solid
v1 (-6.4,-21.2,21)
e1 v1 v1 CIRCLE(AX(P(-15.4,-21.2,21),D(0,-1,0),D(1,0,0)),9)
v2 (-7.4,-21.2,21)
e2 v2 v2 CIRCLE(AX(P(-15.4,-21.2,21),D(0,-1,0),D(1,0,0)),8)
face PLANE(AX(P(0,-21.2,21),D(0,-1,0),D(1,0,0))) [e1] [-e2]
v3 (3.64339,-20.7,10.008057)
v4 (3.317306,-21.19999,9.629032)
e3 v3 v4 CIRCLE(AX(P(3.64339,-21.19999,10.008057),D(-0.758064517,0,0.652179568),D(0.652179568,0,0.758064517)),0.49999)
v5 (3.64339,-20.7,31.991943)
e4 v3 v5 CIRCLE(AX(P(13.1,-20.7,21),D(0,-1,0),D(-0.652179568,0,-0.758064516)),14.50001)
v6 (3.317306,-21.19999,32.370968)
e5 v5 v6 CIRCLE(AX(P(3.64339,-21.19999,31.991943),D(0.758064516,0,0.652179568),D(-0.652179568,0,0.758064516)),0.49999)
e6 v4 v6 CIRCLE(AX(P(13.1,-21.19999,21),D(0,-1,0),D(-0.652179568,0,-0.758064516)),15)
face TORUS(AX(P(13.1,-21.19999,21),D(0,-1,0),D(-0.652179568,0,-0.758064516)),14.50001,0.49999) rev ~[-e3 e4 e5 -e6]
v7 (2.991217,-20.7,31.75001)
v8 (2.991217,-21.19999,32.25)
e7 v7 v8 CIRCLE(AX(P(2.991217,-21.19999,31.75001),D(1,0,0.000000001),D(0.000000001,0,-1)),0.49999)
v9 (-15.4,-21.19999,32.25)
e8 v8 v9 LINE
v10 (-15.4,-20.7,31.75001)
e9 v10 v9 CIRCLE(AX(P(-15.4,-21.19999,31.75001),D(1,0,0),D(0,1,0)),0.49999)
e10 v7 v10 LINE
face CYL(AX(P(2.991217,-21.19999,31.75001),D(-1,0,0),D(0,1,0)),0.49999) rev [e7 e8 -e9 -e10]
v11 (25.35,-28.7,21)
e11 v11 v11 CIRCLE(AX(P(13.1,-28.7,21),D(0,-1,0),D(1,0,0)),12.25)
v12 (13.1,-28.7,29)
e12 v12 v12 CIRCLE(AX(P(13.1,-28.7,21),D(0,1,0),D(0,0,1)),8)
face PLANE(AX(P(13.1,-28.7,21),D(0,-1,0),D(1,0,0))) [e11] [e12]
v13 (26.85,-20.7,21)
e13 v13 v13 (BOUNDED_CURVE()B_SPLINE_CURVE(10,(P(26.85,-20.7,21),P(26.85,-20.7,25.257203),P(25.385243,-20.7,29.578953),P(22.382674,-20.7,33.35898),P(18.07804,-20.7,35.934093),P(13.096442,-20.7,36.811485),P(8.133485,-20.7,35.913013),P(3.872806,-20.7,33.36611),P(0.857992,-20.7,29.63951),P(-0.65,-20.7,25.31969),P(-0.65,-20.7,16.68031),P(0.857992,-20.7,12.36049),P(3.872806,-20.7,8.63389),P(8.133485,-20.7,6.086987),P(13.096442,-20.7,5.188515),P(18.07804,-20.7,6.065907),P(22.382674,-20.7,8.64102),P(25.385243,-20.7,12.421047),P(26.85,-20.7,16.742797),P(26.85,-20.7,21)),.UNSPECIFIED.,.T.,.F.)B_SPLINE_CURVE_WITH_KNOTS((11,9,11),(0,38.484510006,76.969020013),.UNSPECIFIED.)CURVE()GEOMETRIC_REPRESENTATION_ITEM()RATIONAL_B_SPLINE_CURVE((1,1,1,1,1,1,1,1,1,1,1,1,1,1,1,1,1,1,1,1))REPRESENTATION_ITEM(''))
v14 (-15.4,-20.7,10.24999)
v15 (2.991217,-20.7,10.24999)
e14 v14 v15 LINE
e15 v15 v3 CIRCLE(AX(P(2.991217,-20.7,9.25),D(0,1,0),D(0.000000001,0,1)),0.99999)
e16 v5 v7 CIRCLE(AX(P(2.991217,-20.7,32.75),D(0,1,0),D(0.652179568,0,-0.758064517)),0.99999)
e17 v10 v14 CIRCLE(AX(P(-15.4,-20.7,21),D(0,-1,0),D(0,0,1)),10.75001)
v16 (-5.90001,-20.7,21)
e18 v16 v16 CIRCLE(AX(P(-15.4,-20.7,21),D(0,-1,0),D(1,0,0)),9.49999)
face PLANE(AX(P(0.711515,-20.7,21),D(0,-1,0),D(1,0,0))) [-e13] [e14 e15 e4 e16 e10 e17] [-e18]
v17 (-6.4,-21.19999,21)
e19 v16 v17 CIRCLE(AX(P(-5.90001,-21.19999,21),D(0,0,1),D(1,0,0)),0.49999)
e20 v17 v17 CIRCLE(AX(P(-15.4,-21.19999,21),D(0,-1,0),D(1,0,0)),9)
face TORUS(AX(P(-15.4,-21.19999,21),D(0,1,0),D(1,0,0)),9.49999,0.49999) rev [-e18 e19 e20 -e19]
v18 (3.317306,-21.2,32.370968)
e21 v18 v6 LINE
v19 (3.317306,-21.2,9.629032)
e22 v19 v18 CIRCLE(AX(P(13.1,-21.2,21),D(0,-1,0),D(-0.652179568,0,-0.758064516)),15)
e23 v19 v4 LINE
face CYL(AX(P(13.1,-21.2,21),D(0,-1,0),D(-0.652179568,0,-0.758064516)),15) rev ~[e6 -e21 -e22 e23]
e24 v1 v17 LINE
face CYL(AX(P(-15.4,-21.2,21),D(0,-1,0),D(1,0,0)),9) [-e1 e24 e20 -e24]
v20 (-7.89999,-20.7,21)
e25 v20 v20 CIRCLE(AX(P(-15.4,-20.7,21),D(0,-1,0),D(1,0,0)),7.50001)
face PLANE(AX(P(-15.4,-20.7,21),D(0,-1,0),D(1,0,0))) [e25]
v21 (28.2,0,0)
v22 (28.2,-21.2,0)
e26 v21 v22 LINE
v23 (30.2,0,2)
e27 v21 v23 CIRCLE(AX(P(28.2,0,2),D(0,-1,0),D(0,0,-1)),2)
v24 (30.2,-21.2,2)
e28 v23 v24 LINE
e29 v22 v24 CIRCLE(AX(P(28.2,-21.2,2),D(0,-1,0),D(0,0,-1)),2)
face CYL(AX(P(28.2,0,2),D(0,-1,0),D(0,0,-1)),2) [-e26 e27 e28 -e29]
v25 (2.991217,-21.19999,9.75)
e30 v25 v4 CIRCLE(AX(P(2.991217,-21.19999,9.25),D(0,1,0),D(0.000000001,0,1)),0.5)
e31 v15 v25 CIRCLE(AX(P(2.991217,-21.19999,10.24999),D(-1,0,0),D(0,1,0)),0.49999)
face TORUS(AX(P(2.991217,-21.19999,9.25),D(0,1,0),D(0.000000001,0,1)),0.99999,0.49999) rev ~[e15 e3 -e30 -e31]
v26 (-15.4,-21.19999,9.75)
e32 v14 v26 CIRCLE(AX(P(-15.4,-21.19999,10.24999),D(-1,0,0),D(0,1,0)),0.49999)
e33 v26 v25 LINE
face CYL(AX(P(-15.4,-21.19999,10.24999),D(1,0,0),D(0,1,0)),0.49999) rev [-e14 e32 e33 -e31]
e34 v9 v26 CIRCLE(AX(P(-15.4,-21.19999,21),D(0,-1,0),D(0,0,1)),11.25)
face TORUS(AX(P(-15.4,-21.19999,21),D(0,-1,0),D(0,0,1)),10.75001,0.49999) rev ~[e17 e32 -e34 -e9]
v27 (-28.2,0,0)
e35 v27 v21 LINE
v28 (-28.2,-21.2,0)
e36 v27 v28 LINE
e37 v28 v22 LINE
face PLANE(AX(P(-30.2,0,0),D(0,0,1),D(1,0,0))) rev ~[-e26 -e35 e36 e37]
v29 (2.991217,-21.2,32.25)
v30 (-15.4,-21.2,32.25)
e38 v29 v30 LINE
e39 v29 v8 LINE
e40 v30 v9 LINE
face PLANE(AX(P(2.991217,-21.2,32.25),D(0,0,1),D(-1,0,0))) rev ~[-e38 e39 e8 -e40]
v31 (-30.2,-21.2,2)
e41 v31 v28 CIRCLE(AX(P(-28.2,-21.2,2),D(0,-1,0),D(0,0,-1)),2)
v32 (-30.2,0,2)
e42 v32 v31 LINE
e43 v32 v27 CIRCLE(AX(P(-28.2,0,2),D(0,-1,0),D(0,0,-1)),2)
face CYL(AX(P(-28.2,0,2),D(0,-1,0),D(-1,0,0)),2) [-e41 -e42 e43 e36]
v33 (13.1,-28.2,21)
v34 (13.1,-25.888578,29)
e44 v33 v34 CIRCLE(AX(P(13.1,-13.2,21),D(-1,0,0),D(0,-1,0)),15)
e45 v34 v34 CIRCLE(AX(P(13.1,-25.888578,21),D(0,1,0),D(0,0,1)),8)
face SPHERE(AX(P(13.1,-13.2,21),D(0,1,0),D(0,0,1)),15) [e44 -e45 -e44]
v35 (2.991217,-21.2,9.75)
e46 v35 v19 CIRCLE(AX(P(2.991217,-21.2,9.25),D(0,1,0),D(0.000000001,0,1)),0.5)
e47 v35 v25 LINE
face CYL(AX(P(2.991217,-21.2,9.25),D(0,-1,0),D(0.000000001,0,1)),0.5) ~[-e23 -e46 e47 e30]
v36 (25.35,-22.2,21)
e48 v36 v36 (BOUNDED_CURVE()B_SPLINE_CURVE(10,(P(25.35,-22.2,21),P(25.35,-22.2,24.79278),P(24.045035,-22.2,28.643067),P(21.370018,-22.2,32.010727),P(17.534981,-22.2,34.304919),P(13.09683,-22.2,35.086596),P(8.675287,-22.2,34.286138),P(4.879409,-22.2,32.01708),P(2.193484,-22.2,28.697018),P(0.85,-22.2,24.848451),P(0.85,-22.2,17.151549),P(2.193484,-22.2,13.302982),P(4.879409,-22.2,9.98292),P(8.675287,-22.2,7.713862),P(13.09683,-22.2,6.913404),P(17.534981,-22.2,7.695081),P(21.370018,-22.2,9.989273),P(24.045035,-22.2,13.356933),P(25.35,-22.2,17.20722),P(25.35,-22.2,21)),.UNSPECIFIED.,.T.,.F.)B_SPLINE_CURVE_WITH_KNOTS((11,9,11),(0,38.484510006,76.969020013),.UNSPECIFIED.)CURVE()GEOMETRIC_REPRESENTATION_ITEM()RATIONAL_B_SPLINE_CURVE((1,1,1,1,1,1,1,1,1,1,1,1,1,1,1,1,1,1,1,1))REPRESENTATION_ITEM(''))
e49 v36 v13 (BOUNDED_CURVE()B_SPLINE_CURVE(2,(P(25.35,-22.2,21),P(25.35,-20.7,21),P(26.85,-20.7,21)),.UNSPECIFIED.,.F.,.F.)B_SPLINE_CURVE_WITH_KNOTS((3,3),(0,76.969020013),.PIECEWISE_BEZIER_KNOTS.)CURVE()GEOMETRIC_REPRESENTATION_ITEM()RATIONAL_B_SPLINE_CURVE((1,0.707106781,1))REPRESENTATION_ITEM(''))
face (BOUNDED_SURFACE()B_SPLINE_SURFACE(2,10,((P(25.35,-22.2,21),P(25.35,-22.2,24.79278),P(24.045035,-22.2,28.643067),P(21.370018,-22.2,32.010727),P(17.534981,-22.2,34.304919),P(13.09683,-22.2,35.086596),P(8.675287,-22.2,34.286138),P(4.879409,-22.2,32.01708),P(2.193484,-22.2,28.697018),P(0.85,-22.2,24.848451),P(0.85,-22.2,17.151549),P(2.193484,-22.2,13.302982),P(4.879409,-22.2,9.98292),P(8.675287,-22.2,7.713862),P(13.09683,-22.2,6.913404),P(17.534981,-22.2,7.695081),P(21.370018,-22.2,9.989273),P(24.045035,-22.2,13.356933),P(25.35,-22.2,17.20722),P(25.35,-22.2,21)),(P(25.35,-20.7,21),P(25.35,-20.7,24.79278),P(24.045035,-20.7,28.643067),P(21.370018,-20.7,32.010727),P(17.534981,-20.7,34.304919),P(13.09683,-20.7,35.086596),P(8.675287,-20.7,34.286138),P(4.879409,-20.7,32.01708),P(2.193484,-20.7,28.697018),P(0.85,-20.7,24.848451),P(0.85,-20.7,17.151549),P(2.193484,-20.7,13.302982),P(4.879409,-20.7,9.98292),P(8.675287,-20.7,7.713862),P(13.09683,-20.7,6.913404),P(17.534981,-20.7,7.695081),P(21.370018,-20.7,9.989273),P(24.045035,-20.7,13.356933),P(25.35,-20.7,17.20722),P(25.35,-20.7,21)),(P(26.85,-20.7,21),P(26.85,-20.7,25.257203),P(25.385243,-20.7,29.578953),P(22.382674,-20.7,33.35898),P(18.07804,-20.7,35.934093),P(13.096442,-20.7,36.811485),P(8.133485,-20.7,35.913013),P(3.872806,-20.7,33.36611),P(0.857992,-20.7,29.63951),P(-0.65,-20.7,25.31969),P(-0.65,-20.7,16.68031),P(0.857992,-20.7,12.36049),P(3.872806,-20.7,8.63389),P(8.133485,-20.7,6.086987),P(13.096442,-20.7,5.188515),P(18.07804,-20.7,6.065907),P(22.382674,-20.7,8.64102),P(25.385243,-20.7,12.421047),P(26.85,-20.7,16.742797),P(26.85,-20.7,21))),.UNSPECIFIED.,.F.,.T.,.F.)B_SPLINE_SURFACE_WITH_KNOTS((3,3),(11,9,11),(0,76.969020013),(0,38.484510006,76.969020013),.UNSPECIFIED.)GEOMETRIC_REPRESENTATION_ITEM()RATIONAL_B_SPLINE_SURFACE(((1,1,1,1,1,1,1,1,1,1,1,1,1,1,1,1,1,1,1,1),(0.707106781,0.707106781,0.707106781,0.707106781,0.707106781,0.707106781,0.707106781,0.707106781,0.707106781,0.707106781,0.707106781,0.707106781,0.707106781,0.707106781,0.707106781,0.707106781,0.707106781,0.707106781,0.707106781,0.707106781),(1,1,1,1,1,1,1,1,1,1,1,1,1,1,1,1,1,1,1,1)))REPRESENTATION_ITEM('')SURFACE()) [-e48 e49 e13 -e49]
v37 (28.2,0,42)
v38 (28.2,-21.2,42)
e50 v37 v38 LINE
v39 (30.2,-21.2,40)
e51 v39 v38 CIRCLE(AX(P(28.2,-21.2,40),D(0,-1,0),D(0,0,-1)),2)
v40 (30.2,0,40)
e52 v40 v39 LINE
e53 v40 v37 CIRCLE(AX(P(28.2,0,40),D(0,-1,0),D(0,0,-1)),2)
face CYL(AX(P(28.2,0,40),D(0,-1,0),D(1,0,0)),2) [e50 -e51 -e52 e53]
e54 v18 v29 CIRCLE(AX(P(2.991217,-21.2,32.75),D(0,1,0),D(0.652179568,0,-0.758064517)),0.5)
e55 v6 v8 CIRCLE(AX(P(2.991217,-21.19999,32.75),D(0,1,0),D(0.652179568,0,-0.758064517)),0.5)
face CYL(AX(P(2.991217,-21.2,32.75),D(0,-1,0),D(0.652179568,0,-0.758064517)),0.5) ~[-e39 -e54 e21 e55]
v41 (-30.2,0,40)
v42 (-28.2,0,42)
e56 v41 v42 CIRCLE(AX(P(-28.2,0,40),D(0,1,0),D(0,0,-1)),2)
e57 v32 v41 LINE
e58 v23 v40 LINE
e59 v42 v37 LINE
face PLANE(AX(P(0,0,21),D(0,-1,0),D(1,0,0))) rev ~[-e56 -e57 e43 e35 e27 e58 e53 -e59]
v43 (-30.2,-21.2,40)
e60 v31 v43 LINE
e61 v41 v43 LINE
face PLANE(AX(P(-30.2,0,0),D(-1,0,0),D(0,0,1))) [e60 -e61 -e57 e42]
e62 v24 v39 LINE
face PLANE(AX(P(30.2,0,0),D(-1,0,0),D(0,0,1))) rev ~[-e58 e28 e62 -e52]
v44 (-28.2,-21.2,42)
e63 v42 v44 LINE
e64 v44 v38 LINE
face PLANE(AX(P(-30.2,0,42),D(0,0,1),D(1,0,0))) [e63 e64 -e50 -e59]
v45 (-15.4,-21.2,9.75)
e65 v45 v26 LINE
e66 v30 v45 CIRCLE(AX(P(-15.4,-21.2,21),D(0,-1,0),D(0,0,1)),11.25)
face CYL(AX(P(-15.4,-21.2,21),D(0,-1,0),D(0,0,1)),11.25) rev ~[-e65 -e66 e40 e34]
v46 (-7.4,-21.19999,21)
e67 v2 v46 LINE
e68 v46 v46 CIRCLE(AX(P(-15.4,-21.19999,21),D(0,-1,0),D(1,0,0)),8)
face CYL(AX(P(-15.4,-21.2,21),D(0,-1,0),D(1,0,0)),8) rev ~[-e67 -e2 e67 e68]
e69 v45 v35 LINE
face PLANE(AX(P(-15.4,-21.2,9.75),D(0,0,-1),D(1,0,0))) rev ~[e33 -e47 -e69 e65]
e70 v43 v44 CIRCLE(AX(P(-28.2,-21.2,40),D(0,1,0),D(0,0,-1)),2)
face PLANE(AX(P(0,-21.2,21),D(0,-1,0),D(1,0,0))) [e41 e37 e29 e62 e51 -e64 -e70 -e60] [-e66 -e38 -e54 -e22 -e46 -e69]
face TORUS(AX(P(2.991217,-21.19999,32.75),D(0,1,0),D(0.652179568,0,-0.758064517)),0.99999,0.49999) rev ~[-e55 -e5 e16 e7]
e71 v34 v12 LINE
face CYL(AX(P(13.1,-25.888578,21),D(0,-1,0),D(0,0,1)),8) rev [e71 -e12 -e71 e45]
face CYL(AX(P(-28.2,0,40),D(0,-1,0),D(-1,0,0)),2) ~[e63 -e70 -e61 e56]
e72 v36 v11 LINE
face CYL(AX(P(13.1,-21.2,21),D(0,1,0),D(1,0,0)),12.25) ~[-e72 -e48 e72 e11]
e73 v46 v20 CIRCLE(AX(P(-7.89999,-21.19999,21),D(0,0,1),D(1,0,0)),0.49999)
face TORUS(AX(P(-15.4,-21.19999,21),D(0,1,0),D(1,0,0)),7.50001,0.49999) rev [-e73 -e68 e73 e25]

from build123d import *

# Parameters (mm, degrees)
F0_W     = 60.4
F0_H     = 42
F1_DEPTH = 21.2
F2_R     = 2
F3_R     = 9
F3_R_2   = 12.25
F4_DEPTH = 0.5
F3_R_3   = 8
F5_DEPTH = 0.5
F6_DEPTH = 7.5
F10_R    = 1.5
F11_R    = 0.49999
F12_R    = 0.49999


# Not quite as in the source:
# - a fillet or chamfer is up to 0.001 mm smaller than in the source, because OpenCascade refuses the exact size


with BuildPart() as f1:
    # F0 (on Front) → F1 (new body)
    with BuildSketch(Plane.XZ):
        with Locations((0, 21)):
            Rectangle(F0_W, F0_H)
    extrude(amount=F1_DEPTH)

    # F2
    f2_edges = [f1.edges().sort_by_distance(p)[0] for p in [
        (-30.2, -10.6, 42),
        (30.2, -10.6, 42),
        (30.2, -10.6, 0),
        (-30.2, -10.6, 0),
    ]]
    fillet(f2_edges, radius=F2_R)

    # F3 (on face) → F4 (cut)
    with BuildSketch(Plane.XZ.offset(21.2)):
        with BuildLine():
            ThreePointArc((2.9912166904, 9.75), (3.1651187763, 9.7187836009), (3.3173064746, 9.6290322581))
            ThreePointArc((3.3173064746, 9.6290322581), (28.1, 21), (3.3173064746, 32.3709677419))
            ThreePointArc((3.3173064746, 32.3709677419), (3.1651187763, 32.2812163991), (2.9912166904, 32.25))
            Line((2.9912166904, 32.25), (-15.4, 32.25))
            ThreePointArc((-15.4, 32.25), (-26.65, 21), (-15.4, 9.75))
            Line((-15.4, 9.75), (2.9912166904, 9.75))
        make_face()
        with Locations((-15.4, 21)):
            Circle(F3_R, mode=Mode.SUBTRACT)
        with Locations((13.1, 21)):
            Circle(F3_R_2, mode=Mode.SUBTRACT)
    extrude(amount=-F4_DEPTH, mode=Mode.SUBTRACT)

    # F3 (on face) → F5 (cut)
    with BuildSketch(Plane.XZ.offset(21.2)):
        with Locations((-15.4, 21)):
            Circle(F3_R_3)
    extrude(amount=-F5_DEPTH, mode=Mode.SUBTRACT)

    # F3 (on face) → F6 (join)
    with BuildSketch(Plane.XZ.offset(21.2)):
        with Locations((13.1, 21)):
            Circle(F3_R_2)
    extrude(amount=F6_DEPTH)

    # F8 (on offset) → F9 (revolve, cut)
    with BuildSketch(Plane.YZ.offset(13.1)):
        with BuildLine():
            ThreePointArc((-28.2, 21), (-27.6105631935, 25.1636124275), (-25.8885775404, 29))
            Line((-25.8885775404, 29), (-28.7, 29))
            Line((-28.7, 29), (-28.7, 21))
            Line((-28.7, 21), (-28.2, 21))
        make_face()
    revolve(axis=Axis((13.1, -14.35, 21), (0, 1, 0)), mode=Mode.SUBTRACT)

    # F10
    f10_edges = [f1.edges().sort_by_distance(p)[0] for p in [
        (0.85, -20.7, 21),
    ]]
    fillet(f10_edges, radius=F10_R)

    # F11 (radius 0.5 in the source; OpenCascade refuses exactly that, so slightly less here)
    f11_edges = [f1.edges().sort_by_distance(p)[0] for p in [
        (-0.65, -20.7, 21),
        (-6.204392, -20.7, 9.75),
        (3.165119, -20.7, 9.718784),
        (28.1, -20.7, 21),
        (3.165119, -20.7, 32.281216),
        (-6.204392, -20.7, 32.25),
        (-26.65, -20.7, 21),
        (-24.4, -20.7, 21),
    ]]
    fillet(f11_edges, radius=F11_R)

    # F12 (radius 0.5 in the source; OpenCascade refuses exactly that, so slightly less here)
    f12_edges = [f1.edges().sort_by_distance(p)[0] for p in [
        (-23.4, -20.7, 21),
    ]]
    fillet(f12_edges, radius=F12_R)


solid = f1.part
